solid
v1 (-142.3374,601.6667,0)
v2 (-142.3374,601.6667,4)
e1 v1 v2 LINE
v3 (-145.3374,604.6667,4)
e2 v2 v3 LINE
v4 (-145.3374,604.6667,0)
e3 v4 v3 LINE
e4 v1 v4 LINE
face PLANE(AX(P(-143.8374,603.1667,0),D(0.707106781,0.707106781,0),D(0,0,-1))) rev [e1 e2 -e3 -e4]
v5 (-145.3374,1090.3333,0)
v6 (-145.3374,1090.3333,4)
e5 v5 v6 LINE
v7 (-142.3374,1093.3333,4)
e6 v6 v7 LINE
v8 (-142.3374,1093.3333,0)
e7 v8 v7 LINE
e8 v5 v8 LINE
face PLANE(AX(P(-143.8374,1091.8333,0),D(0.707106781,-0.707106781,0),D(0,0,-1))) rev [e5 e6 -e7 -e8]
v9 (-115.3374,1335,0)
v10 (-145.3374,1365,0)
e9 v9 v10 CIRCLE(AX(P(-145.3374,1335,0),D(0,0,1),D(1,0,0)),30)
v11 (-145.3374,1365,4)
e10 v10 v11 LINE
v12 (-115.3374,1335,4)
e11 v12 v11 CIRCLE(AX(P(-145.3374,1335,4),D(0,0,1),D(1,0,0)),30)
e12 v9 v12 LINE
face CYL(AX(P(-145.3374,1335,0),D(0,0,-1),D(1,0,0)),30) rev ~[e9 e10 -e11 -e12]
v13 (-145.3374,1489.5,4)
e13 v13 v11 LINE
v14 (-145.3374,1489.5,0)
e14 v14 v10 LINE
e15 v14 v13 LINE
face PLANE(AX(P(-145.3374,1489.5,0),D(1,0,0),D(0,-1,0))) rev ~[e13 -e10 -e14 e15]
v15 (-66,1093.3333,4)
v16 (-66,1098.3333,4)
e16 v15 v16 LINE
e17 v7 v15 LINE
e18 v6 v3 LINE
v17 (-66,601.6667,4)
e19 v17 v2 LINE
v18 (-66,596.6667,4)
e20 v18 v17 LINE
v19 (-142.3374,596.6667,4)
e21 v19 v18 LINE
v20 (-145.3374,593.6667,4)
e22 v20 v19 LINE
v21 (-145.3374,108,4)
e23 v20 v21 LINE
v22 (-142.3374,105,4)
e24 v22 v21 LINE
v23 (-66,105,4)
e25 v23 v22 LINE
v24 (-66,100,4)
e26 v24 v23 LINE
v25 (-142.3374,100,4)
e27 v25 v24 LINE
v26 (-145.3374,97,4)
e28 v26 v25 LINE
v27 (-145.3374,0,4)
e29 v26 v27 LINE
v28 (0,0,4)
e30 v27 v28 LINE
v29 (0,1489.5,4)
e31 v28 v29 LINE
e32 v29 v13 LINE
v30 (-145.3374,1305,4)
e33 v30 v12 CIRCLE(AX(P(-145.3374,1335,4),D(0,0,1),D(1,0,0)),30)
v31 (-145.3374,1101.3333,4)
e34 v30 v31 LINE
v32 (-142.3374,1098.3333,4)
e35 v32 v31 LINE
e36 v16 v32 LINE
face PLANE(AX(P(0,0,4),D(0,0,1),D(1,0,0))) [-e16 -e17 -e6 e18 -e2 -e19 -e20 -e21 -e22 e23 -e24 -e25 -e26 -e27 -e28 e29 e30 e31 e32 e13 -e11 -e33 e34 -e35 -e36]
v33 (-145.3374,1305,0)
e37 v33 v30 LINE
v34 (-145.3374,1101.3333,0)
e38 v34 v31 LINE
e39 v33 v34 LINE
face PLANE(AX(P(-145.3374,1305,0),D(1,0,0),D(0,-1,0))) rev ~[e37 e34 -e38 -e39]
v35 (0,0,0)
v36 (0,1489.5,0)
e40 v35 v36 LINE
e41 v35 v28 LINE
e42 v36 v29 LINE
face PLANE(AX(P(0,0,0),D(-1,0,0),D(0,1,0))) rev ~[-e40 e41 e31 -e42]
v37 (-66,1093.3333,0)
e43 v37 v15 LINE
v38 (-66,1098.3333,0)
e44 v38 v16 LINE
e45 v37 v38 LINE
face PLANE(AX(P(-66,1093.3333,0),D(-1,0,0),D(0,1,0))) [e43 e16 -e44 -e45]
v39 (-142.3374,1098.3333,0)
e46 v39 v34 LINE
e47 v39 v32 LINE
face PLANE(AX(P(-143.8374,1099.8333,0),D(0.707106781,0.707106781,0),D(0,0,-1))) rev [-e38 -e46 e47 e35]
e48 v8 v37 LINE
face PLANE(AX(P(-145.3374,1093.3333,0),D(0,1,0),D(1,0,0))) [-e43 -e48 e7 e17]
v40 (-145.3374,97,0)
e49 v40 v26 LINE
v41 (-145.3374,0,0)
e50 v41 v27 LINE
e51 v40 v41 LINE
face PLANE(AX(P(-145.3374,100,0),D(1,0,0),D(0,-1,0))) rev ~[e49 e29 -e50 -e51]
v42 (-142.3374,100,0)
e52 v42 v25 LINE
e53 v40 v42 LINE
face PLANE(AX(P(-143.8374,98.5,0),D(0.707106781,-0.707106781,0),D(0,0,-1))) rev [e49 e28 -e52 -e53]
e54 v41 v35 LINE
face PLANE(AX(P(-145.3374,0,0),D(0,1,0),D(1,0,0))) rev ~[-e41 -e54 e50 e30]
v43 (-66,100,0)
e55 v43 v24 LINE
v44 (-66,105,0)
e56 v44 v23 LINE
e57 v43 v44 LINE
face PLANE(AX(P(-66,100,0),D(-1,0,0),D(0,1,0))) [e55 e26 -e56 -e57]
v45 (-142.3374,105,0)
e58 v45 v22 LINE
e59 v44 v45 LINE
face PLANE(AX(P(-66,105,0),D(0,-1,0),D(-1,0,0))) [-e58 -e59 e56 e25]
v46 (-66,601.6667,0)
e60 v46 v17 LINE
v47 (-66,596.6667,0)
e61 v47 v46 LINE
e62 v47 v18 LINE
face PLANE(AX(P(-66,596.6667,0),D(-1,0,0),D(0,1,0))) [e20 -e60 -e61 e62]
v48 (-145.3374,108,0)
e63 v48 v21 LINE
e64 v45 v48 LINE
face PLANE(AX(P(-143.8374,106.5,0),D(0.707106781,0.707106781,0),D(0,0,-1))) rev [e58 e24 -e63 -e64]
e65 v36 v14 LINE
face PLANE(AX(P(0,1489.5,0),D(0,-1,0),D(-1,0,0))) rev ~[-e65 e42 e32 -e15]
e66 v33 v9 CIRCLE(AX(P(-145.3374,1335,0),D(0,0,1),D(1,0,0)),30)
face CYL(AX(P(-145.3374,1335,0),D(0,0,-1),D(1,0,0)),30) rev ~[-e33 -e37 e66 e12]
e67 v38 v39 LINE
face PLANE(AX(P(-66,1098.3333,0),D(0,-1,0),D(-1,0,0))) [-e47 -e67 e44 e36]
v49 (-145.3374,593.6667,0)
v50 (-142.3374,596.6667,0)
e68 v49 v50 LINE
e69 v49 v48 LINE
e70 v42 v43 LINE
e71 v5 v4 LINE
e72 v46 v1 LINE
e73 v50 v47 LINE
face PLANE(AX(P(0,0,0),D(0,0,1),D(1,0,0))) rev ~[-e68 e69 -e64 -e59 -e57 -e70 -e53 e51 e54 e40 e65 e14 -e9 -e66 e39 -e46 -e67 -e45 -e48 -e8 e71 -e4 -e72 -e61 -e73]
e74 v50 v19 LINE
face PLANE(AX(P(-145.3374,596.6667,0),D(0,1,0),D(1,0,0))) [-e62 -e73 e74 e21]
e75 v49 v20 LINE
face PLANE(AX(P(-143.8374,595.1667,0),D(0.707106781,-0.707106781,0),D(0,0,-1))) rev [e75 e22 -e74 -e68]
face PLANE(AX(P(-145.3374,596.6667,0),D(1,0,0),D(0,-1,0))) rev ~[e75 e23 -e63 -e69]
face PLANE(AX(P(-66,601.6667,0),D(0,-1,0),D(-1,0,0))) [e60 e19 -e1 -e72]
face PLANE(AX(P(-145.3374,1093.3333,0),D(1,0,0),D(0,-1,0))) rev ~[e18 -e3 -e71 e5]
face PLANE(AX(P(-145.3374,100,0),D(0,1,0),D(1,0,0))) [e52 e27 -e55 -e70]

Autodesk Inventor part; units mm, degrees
ref_plane "YZ Plane" through (0, 0, 0) normal (1, 0, 0) x (0, 1, 0)
ref_plane "XZ Plane" through (0, 0, 0) normal (0, 1, 0) x (-1, 0, 0)
ref_plane "XY Plane" through (0, 0, 0) normal (0, 0, 1) x (1, 0, 0)
sketch "Sketch1" plane through (0, 0, 0) normal (0, 0, 1) x (1, 0, 0)
  line L0 (0, 1489.5) -> (-145.3374, 1489.5)
  line L1 (-145.3374, 1489.5) -> (-145.3374, 0)
  line L2 (-145.3374, 0) -> (0, 0)
  line L3 (0, 0) -> (0, 1489.5)
  line L4 (-145.3374, 100) -> (-66, 100)
  line L5 (-66, 100) -> (-66, 105)
  line L6 (-66, 105) -> (-145.3374, 105)
  line L7 (-145.3374, 105) -> (-145.3374, 100)
  line L8 (-145.3374, 596.6667) -> (-66, 596.6667)
  line L9 (-66, 596.6667) -> (-66, 601.6667)
  line L10 (-66, 601.6667) -> (-145.3374, 601.6667)
  line L11 (-145.3374, 601.6667) -> (-145.3374, 596.6667)
  line L12 (-145.3374, 1093.3333) -> (-66, 1093.3333)
  line L13 (-66, 1093.3333) -> (-66, 1098.3333)
  line L14 (-66, 1098.3333) -> (-145.3374, 1098.3333)
  line L15 (-145.3374, 1098.3333) -> (-145.3374, 1093.3333)
  circle A0 centre (-145.3374, 1335) radius 30
  point P0 (-145.3374, 1098.3333)
  point P1 (-145.3374, 1093.3333)
  point P2 (-145.3374, 105)
  point P3 (-145.3374, 1365)
  point P4 (-145.3374, 1305)
  dimension "d0" = 1489.5
  dimension "d1" = 145.3374
  dimension "d2" = 5
  dimension "d4" = 100
  dimension "d7" = 496.6667
  dimension "d23" = 66
  dimension "d29" = 60
  dimension "d30" = 1335
extrude "Plate1" add sketch "Sketch1" along normal blind 4 contours L3 L2 L1 L4 L5 L6 L8 L9 L10 L12 L13 L14 A0 L0
chamfer "Corner Chamfer1" distance 3 angle 45 6 edges at (-145.3374, 100, 2) (-145.3374, 105, 2) (-145.3374, 596.6667, 2) (-145.3374, 601.6667, 2) (-145.3374, 1098.3333, 2) (-145.3374, 1093.3333, 2)
equation "\"d0\" = Стрингер_длина"
equation "\"d1\" = стрингер_глубина_5"
equation "\"d2\" = паз_под_стрингер_толщина"
equation "\"d7\" = Шаг_шпангоутов"
equation "\"d23\" = паз_под_стрингер_глубина - Thickness"
equation "\"d29\" = 2 * радиус_выреза_под_сварку"
equation "\"d12\" = Thickness"
equation "\"BendRadius\" = Thickness"
equation "\"BendReliefWidth\" = Thickness"
equation "\"BendReliefDepth\" = 0.5 * Thickness"
equation "\"CornerReliefSize\" = 4 * Thickness"
equation "\"MinimumRemnant\" = 2 * Thickness"
equation "\"TransitionRadius\" = BendRadius"
equation "\"JacobiRadiusSize\" = BendRadius"
equation "\"GapSize\" = Thickness"
equation "\"Стрингер_длина\" = 1489.5"
equation "\"стрингер_глубина_5\" = 145.337419"
equation "\"паз_под_стрингер_толщина\" = 5"
equation "\"Шаг_шпангоутов\" = 496.666667"
equation "\"паз_под_стрингер_глубина\" = 70"
equation "\"Thickness\" = 4"
equation "\"радиус_выреза_под_сварку\" = 30"
properties part number "GBK 3215 stringer 5" material "Steel"
